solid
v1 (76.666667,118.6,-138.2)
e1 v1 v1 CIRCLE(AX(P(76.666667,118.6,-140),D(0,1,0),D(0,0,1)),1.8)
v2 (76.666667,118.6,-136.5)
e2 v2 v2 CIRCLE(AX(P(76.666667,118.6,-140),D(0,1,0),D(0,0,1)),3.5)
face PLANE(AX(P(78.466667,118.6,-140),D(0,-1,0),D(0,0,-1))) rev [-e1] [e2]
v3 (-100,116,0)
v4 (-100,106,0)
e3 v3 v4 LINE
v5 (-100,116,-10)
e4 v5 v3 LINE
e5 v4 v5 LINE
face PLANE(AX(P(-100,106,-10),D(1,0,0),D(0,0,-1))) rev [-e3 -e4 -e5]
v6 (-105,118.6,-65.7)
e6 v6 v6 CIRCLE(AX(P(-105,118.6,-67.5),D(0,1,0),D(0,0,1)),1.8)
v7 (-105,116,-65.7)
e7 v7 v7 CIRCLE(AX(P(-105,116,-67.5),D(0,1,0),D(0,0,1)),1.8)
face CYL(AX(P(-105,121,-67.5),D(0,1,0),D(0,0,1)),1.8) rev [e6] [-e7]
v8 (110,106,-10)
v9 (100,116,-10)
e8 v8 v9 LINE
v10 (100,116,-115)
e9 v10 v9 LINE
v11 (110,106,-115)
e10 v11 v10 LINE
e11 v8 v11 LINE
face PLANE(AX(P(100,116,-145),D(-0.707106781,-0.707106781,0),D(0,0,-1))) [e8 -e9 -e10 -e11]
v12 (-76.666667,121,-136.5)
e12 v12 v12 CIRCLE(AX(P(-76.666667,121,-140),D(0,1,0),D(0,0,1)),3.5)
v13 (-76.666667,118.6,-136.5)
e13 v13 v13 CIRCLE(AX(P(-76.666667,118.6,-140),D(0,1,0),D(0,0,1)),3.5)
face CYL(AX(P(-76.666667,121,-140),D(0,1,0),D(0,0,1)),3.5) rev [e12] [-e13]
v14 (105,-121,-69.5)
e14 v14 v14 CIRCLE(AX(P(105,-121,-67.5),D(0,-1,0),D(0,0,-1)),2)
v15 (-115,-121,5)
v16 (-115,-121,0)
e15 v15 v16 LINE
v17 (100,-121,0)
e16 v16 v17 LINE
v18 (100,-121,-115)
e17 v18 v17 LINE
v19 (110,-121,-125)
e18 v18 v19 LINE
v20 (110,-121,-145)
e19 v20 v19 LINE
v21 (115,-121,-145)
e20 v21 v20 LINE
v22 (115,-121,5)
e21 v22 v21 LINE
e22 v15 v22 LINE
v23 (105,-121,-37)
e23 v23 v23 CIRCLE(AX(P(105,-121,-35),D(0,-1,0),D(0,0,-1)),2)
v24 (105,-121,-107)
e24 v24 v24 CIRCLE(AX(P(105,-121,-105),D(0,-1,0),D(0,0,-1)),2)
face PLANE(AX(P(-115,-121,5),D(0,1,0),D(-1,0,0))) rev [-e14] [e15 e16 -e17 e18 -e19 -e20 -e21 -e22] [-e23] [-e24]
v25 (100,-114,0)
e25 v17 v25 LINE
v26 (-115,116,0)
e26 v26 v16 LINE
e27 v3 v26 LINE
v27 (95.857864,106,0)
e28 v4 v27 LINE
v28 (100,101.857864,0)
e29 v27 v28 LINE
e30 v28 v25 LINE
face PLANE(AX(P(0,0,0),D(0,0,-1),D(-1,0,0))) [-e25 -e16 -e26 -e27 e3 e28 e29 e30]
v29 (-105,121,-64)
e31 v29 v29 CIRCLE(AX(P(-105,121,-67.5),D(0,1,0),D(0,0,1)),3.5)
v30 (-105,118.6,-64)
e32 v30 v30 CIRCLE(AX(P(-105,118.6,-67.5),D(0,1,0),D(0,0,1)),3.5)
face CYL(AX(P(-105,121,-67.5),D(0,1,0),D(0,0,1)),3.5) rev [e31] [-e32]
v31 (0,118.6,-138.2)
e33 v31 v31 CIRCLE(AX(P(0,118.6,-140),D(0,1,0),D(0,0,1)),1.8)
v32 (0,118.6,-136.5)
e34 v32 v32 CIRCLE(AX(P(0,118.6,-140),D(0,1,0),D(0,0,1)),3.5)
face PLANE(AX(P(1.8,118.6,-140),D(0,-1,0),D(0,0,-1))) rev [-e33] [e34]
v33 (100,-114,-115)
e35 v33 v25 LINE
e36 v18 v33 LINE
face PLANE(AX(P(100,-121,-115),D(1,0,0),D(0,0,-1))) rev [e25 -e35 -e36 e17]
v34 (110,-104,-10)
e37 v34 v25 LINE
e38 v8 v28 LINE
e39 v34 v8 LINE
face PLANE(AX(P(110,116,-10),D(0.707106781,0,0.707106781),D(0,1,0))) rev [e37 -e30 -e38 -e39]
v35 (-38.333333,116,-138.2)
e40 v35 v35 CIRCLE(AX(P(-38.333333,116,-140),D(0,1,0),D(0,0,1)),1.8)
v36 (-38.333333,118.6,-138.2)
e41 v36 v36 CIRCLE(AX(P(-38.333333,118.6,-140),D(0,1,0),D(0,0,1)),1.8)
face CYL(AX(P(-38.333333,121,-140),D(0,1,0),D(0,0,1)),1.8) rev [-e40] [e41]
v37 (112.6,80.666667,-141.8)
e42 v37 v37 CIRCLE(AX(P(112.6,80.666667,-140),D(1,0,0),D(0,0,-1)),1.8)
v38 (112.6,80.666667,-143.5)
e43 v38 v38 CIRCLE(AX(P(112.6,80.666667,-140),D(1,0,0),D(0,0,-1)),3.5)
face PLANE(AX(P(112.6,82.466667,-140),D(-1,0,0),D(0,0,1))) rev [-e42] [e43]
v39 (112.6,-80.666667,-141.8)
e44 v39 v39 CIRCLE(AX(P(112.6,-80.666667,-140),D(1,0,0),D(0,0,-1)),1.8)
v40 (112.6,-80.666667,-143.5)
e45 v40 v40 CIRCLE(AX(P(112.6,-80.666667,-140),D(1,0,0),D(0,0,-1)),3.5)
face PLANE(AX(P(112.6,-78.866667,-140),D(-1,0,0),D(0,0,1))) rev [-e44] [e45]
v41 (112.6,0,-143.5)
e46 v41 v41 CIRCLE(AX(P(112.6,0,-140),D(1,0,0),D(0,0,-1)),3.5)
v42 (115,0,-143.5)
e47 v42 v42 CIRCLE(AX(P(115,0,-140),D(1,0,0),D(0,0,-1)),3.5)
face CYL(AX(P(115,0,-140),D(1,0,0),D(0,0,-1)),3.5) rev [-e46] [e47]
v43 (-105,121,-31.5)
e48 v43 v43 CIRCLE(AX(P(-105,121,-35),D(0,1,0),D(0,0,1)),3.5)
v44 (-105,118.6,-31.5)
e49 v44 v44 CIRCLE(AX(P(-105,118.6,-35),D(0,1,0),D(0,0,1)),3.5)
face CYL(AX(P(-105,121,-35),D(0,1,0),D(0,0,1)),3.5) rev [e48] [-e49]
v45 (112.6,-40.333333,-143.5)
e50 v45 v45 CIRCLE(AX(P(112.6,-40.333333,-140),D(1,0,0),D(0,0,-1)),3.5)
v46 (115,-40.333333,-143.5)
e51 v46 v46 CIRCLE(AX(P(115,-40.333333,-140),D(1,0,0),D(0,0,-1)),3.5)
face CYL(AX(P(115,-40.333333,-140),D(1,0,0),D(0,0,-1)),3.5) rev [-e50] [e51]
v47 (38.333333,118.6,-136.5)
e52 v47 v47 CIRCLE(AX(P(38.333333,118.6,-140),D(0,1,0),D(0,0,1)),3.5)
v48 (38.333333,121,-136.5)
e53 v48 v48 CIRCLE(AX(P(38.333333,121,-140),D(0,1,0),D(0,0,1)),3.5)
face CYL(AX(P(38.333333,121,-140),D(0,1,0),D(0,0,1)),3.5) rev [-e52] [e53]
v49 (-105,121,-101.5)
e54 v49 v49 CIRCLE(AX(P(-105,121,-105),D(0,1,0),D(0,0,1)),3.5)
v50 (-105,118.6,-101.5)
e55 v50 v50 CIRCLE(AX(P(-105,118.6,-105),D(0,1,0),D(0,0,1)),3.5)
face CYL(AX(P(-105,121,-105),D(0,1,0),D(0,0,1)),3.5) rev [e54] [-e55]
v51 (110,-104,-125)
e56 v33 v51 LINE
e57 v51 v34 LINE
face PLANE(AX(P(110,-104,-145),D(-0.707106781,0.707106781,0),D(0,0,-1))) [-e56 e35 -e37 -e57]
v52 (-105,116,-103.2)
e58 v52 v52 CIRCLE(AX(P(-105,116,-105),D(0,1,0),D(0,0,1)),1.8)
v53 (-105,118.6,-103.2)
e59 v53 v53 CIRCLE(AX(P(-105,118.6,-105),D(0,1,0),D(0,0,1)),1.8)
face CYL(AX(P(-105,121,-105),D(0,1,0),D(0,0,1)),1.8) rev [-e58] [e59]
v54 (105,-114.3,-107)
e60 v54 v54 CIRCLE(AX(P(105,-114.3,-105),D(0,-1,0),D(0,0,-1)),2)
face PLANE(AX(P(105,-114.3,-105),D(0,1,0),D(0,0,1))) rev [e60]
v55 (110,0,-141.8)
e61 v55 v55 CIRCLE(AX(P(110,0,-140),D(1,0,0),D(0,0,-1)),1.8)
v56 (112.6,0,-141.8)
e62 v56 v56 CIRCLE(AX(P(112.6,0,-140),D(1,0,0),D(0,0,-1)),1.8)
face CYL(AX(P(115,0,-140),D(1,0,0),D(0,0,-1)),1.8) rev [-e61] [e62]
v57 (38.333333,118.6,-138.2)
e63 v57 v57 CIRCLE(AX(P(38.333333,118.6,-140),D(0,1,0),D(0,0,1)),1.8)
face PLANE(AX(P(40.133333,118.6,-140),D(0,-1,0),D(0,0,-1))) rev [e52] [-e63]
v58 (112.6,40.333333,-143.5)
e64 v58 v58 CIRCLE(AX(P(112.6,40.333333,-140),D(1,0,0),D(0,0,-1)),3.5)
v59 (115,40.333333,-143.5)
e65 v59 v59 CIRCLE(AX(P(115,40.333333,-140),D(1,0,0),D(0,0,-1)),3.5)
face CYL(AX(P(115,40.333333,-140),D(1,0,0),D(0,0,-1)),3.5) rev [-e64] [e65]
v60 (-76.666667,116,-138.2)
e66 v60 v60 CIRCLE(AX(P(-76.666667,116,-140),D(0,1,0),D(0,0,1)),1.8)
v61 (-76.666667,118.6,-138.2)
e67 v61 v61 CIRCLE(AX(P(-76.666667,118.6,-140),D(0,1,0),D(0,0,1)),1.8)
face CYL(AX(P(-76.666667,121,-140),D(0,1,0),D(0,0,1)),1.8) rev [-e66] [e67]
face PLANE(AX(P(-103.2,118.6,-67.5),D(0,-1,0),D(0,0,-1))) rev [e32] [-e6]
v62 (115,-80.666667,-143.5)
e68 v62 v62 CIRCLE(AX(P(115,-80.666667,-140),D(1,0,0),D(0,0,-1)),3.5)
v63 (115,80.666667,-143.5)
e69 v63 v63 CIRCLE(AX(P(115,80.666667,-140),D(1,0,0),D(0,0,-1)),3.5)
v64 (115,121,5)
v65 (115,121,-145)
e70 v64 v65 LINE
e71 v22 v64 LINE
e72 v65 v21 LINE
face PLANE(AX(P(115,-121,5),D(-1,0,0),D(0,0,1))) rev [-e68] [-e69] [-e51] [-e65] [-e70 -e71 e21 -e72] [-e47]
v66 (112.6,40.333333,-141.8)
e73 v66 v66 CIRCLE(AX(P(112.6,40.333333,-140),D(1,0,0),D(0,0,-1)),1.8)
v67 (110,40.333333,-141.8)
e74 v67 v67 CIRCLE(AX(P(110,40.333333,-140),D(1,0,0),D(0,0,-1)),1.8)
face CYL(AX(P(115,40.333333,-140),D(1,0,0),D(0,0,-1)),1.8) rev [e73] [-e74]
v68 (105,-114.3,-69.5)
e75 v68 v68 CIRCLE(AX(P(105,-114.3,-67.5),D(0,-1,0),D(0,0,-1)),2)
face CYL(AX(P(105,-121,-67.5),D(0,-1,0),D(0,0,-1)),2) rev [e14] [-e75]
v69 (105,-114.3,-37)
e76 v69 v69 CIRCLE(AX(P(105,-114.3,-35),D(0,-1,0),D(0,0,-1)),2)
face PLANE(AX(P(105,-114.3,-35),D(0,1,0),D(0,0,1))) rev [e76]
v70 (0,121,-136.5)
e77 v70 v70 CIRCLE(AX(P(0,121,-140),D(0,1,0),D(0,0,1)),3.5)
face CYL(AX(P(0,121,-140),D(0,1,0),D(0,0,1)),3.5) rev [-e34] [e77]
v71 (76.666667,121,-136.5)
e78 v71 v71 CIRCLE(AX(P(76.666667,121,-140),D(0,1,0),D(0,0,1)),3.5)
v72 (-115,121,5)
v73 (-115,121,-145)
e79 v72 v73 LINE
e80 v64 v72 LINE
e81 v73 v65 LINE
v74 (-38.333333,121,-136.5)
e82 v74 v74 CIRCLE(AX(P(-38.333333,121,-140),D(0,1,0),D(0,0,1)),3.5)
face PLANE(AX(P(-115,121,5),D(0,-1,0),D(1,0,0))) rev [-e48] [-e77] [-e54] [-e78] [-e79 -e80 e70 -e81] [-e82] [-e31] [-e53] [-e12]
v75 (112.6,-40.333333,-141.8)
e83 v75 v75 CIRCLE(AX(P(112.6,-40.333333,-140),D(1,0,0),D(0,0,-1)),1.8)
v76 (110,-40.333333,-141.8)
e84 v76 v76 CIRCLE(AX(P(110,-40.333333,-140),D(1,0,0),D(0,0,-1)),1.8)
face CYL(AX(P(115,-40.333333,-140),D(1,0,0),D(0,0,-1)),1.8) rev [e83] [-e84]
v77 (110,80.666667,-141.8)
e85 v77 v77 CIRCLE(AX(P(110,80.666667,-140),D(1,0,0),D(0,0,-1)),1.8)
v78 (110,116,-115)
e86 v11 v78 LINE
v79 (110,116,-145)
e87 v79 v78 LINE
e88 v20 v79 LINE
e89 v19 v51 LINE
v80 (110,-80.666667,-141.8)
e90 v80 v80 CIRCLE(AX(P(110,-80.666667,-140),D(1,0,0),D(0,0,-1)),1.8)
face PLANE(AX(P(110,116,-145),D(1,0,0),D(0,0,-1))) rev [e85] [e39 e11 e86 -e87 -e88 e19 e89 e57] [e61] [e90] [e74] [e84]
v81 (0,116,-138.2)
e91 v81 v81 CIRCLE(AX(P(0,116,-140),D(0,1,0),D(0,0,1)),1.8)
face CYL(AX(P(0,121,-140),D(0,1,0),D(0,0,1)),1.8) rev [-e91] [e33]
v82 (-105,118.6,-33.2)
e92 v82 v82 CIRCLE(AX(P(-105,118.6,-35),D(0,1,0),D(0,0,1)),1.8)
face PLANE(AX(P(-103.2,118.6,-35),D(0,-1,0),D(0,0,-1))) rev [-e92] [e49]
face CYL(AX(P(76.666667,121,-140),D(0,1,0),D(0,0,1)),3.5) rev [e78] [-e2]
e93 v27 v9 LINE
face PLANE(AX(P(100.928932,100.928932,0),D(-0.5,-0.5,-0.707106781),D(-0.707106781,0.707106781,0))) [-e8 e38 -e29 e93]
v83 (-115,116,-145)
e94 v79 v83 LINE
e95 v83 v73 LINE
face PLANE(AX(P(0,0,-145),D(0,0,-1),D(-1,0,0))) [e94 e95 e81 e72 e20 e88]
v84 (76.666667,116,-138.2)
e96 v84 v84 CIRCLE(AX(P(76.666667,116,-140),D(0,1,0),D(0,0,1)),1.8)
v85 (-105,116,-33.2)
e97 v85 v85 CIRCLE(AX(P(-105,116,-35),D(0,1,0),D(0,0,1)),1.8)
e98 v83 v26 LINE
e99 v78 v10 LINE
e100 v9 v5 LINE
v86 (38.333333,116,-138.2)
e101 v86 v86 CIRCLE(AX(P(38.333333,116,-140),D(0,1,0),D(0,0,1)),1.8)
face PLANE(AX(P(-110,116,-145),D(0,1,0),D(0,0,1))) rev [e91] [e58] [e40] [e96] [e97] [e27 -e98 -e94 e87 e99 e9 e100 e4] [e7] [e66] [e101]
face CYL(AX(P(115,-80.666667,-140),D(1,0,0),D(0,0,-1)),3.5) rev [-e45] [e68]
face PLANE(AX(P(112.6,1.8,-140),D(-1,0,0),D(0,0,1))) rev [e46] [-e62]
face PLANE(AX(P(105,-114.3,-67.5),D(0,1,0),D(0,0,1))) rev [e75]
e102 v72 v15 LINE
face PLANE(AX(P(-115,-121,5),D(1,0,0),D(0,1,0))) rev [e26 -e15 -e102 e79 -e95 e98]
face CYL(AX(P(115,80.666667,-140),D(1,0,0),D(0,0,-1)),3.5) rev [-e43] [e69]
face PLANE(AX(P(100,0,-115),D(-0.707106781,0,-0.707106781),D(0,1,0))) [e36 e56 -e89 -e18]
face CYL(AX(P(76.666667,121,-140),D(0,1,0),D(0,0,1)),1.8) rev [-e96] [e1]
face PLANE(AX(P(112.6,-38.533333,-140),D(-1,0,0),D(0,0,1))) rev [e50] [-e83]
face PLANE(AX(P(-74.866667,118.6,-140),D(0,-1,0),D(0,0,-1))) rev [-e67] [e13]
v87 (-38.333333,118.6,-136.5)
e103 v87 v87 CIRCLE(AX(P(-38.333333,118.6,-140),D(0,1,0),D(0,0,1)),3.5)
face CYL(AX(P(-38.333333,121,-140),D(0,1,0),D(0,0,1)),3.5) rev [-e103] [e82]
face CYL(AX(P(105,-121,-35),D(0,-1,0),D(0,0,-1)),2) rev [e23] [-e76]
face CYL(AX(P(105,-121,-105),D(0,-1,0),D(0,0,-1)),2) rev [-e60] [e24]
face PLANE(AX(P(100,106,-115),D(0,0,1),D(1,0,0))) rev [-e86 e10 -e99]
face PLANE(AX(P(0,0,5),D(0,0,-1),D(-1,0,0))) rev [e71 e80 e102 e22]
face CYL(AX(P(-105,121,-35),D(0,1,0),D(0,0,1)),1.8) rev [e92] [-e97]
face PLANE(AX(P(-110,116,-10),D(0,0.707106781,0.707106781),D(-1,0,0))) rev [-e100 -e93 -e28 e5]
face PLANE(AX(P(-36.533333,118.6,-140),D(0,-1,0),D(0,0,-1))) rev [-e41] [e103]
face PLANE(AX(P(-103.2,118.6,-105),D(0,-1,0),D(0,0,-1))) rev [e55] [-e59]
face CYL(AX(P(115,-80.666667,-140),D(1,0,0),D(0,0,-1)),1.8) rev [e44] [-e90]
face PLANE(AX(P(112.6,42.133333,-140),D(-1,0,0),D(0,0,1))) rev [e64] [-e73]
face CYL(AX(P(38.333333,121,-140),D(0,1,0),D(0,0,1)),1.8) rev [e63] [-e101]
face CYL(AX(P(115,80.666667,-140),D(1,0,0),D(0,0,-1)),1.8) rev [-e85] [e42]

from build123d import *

# Parameters (mm, degrees)
SZKIC1_W                                          = 230
SZKIC1_H                                          = 242
DODANIE_WYCI_GNI_CIE1_DEPTH                       = 5
DODANIE_WYCI_GNI_CIE2_DEPTH                       = 145
SFAZOWANIE1_START                                 = -115
SFAZOWANIE1_DEPTH                                 = 116
SFAZOWANIE2_SIZE                                  = 10
SFAZOWANIE3_START                                 = -100
SFAZOWANIE3_DEPTH                                 = 210
POG_BIENIE_WALCOWE_POD_M3_RUB_Z_BEM_S_D           = 3.6
POG_BIENIE_WALCOWE_POD_M3_RUB_Z_BEM_S_DEPTH       = 6.7
POG_BIENIE_WALCOWE_POD_M3_RUB_Z_BEM_S_CBORE_D     = 7
POG_BIENIE_WALCOWE_POD_M3_RUB_Z_BEM_S_CBORE_DEPTH = 2.4
POG_BIENIE_WALCOWE_POD_M3_RUB_Z_BEM_S_TIP         = 1.081549114
POG_BIENIE_WALCOWE_POD_M3_RUB_Z_B_2_D             = 3.6
POG_BIENIE_WALCOWE_POD_M3_RUB_Z_B_2_DEPTH         = 6.7
POG_BIENIE_WALCOWE_POD_M3_RUB_Z_B_2_CBORE_D       = 7
POG_BIENIE_WALCOWE_POD_M3_RUB_Z_B_2_CBORE_DEPTH   = 2.4
POG_BIENIE_WALCOWE_POD_M3_RUB_Z_B_2_TIP           = 1.081549114
POG_BIENIE_WALCOWE_POD_M3_RUB_Z_B_3_D             = 3.6
POG_BIENIE_WALCOWE_POD_M3_RUB_Z_B_3_DEPTH         = 6.7
POG_BIENIE_WALCOWE_POD_M3_RUB_Z_B_3_CBORE_D       = 7
POG_BIENIE_WALCOWE_POD_M3_RUB_Z_B_3_CBORE_DEPTH   = 2.4
POG_BIENIE_WALCOWE_POD_M3_RUB_Z_B_3_TIP           = 1.081549114
SZKIC13_W                                         = 10
SZKIC13_H                                         = 7
DODANIE_WYCI_GNI_CIE3_DEPTH                       = 115
OTWORY_USTALAJ_CE_4_0MM1_D                        = 4
OTWORY_USTALAJ_CE_4_0MM1_DEPTH                    = 6.7
SFAZOWANIE4_SIZE                                  = 10


with BuildPart() as part:
    # Szkic1 → Dodanie-wyciągnięcie1 (new body)
    with BuildSketch(Plane.XY):
        Rectangle(SZKIC1_W, SZKIC1_H)
    extrude(amount=DODANIE_WYCI_GNI_CIE1_DEPTH)

    # Szkic6 → Dodanie-wyciągnięcie2 (add)
    with BuildSketch(Plane(origin=(0, 0, 0), x_dir=(-1, 0, 0), z_dir=(0, 0, -1))):
        Polygon((-115, 121), (-115, -121), (-110, -121), (-110, -116), (-110, 116), (110, 116), (115, 116), (115, 121), align=None)
    extrude(amount=DODANIE_WYCI_GNI_CIE2_DEPTH)

    # Sfazowanie1: read off the stored shape, not the designer's step
    # Sfazowanie1 outline → Sfazowanie1 (add)
    with BuildSketch(Plane.XY.offset(SFAZOWANIE1_START)):
        Polygon((110, 116), (100, 116), (110, 106), align=None)
    extrude(amount=SFAZOWANIE1_DEPTH)

    # Sfazowanie2
    sfazowanie2_edges = [part.edges().sort_by_distance(p)[0] for p in [
        (110, -7.5, 0),
        (105, 111, 0),
    ]]
    chamfer(sfazowanie2_edges, length=SFAZOWANIE2_SIZE)

    # Sfazowanie3: read off the stored shape, not the designer's step
    # Sfazowanie3 outline → Sfazowanie3 (add)
    with BuildSketch(Plane.YZ.offset(SFAZOWANIE3_START)):
        Polygon((106, 0), (116, -10), (116, 0), align=None)
    extrude(amount=SFAZOWANIE3_DEPTH)

    # Pog_bienie walcowe pod M3 _rub_ z _bem s
    with Locations(Plane(origin=(0, 121, 0), x_dir=(1, 0, 0), z_dir=(0, 1, 0))):
        with Locations((-76.666666667, 140), (-38.333333337, 140), (-7e-09, 140), (38.333333323, 140), (76.666666653, 140)):
            CounterBoreHole(POG_BIENIE_WALCOWE_POD_M3_RUB_Z_BEM_S_D / 2, POG_BIENIE_WALCOWE_POD_M3_RUB_Z_BEM_S_CBORE_D / 2, POG_BIENIE_WALCOWE_POD_M3_RUB_Z_BEM_S_CBORE_DEPTH, depth=POG_BIENIE_WALCOWE_POD_M3_RUB_Z_BEM_S_DEPTH)
            with Locations((0, 0, -(POG_BIENIE_WALCOWE_POD_M3_RUB_Z_BEM_S_DEPTH + POG_BIENIE_WALCOWE_POD_M3_RUB_Z_BEM_S_TIP / 2))):  # 118° drill point
                Cone(0, POG_BIENIE_WALCOWE_POD_M3_RUB_Z_BEM_S_D / 2, POG_BIENIE_WALCOWE_POD_M3_RUB_Z_BEM_S_TIP, mode=Mode.SUBTRACT)

    # Pog_bienie walcowe pod M3 _rub_ z _b 2
    with Locations(Plane(origin=(115, 0, 0), x_dir=(0, 0, -1), z_dir=(1, 0, 0))):
        with Locations((140, 80.666666667), (140, 40.333333337), (140, 7e-09), (140, -40.333333323), (140, -80.666666653)):
            CounterBoreHole(POG_BIENIE_WALCOWE_POD_M3_RUB_Z_B_2_D / 2, POG_BIENIE_WALCOWE_POD_M3_RUB_Z_B_2_CBORE_D / 2, POG_BIENIE_WALCOWE_POD_M3_RUB_Z_B_2_CBORE_DEPTH, depth=POG_BIENIE_WALCOWE_POD_M3_RUB_Z_B_2_DEPTH)
            with Locations((0, 0, -(POG_BIENIE_WALCOWE_POD_M3_RUB_Z_B_2_DEPTH + POG_BIENIE_WALCOWE_POD_M3_RUB_Z_B_2_TIP / 2))):  # 118° drill point
                Cone(0, POG_BIENIE_WALCOWE_POD_M3_RUB_Z_B_2_D / 2, POG_BIENIE_WALCOWE_POD_M3_RUB_Z_B_2_TIP, mode=Mode.SUBTRACT)

    # Pog_bienie walcowe pod M3 _rub_ z _b 3
    with Locations(Plane(origin=(0, 121, 0), x_dir=(1, 0, 0), z_dir=(0, 1, 0))):
        with Locations((-105, 105), (-105, 67.5), (-105, 35)):
            CounterBoreHole(POG_BIENIE_WALCOWE_POD_M3_RUB_Z_B_3_D / 2, POG_BIENIE_WALCOWE_POD_M3_RUB_Z_B_3_CBORE_D / 2, POG_BIENIE_WALCOWE_POD_M3_RUB_Z_B_3_CBORE_DEPTH, depth=POG_BIENIE_WALCOWE_POD_M3_RUB_Z_B_3_DEPTH)
            with Locations((0, 0, -(POG_BIENIE_WALCOWE_POD_M3_RUB_Z_B_3_DEPTH + POG_BIENIE_WALCOWE_POD_M3_RUB_Z_B_3_TIP / 2))):  # 118° drill point
                Cone(0, POG_BIENIE_WALCOWE_POD_M3_RUB_Z_B_3_D / 2, POG_BIENIE_WALCOWE_POD_M3_RUB_Z_B_3_TIP, mode=Mode.SUBTRACT)

    # Szkic13 → Dodanie-wyciągnięcie3 (add)
    with BuildSketch(Plane(origin=(0, 0, 0), x_dir=(-1, 0, 0), z_dir=(0, 0, -1))):
        with Locations((-105, -117.5)):
            Rectangle(SZKIC13_W, SZKIC13_H)
    extrude(amount=DODANIE_WYCI_GNI_CIE3_DEPTH)

    # Otwory ustalające Ø4.0mm1
    with Locations(Plane.XZ.offset(121)):
        with Locations((105, -105), (105, -67.5), (105, -35)):
            Hole(OTWORY_USTALAJ_CE_4_0MM1_D / 2, depth=OTWORY_USTALAJ_CE_4_0MM1_DEPTH)

    # Sfazowanie4
    sfazowanie4_edges = [part.edges().sort_by_distance(p)[0] for p in [
        (110, -117.5, -115),
        (110, -114, -62.5),
    ]]
    chamfer(sfazowanie4_edges, length=SFAZOWANIE4_SIZE - 0.0001)  # a hair under: the kernel refuses the full size


solid = part.part
